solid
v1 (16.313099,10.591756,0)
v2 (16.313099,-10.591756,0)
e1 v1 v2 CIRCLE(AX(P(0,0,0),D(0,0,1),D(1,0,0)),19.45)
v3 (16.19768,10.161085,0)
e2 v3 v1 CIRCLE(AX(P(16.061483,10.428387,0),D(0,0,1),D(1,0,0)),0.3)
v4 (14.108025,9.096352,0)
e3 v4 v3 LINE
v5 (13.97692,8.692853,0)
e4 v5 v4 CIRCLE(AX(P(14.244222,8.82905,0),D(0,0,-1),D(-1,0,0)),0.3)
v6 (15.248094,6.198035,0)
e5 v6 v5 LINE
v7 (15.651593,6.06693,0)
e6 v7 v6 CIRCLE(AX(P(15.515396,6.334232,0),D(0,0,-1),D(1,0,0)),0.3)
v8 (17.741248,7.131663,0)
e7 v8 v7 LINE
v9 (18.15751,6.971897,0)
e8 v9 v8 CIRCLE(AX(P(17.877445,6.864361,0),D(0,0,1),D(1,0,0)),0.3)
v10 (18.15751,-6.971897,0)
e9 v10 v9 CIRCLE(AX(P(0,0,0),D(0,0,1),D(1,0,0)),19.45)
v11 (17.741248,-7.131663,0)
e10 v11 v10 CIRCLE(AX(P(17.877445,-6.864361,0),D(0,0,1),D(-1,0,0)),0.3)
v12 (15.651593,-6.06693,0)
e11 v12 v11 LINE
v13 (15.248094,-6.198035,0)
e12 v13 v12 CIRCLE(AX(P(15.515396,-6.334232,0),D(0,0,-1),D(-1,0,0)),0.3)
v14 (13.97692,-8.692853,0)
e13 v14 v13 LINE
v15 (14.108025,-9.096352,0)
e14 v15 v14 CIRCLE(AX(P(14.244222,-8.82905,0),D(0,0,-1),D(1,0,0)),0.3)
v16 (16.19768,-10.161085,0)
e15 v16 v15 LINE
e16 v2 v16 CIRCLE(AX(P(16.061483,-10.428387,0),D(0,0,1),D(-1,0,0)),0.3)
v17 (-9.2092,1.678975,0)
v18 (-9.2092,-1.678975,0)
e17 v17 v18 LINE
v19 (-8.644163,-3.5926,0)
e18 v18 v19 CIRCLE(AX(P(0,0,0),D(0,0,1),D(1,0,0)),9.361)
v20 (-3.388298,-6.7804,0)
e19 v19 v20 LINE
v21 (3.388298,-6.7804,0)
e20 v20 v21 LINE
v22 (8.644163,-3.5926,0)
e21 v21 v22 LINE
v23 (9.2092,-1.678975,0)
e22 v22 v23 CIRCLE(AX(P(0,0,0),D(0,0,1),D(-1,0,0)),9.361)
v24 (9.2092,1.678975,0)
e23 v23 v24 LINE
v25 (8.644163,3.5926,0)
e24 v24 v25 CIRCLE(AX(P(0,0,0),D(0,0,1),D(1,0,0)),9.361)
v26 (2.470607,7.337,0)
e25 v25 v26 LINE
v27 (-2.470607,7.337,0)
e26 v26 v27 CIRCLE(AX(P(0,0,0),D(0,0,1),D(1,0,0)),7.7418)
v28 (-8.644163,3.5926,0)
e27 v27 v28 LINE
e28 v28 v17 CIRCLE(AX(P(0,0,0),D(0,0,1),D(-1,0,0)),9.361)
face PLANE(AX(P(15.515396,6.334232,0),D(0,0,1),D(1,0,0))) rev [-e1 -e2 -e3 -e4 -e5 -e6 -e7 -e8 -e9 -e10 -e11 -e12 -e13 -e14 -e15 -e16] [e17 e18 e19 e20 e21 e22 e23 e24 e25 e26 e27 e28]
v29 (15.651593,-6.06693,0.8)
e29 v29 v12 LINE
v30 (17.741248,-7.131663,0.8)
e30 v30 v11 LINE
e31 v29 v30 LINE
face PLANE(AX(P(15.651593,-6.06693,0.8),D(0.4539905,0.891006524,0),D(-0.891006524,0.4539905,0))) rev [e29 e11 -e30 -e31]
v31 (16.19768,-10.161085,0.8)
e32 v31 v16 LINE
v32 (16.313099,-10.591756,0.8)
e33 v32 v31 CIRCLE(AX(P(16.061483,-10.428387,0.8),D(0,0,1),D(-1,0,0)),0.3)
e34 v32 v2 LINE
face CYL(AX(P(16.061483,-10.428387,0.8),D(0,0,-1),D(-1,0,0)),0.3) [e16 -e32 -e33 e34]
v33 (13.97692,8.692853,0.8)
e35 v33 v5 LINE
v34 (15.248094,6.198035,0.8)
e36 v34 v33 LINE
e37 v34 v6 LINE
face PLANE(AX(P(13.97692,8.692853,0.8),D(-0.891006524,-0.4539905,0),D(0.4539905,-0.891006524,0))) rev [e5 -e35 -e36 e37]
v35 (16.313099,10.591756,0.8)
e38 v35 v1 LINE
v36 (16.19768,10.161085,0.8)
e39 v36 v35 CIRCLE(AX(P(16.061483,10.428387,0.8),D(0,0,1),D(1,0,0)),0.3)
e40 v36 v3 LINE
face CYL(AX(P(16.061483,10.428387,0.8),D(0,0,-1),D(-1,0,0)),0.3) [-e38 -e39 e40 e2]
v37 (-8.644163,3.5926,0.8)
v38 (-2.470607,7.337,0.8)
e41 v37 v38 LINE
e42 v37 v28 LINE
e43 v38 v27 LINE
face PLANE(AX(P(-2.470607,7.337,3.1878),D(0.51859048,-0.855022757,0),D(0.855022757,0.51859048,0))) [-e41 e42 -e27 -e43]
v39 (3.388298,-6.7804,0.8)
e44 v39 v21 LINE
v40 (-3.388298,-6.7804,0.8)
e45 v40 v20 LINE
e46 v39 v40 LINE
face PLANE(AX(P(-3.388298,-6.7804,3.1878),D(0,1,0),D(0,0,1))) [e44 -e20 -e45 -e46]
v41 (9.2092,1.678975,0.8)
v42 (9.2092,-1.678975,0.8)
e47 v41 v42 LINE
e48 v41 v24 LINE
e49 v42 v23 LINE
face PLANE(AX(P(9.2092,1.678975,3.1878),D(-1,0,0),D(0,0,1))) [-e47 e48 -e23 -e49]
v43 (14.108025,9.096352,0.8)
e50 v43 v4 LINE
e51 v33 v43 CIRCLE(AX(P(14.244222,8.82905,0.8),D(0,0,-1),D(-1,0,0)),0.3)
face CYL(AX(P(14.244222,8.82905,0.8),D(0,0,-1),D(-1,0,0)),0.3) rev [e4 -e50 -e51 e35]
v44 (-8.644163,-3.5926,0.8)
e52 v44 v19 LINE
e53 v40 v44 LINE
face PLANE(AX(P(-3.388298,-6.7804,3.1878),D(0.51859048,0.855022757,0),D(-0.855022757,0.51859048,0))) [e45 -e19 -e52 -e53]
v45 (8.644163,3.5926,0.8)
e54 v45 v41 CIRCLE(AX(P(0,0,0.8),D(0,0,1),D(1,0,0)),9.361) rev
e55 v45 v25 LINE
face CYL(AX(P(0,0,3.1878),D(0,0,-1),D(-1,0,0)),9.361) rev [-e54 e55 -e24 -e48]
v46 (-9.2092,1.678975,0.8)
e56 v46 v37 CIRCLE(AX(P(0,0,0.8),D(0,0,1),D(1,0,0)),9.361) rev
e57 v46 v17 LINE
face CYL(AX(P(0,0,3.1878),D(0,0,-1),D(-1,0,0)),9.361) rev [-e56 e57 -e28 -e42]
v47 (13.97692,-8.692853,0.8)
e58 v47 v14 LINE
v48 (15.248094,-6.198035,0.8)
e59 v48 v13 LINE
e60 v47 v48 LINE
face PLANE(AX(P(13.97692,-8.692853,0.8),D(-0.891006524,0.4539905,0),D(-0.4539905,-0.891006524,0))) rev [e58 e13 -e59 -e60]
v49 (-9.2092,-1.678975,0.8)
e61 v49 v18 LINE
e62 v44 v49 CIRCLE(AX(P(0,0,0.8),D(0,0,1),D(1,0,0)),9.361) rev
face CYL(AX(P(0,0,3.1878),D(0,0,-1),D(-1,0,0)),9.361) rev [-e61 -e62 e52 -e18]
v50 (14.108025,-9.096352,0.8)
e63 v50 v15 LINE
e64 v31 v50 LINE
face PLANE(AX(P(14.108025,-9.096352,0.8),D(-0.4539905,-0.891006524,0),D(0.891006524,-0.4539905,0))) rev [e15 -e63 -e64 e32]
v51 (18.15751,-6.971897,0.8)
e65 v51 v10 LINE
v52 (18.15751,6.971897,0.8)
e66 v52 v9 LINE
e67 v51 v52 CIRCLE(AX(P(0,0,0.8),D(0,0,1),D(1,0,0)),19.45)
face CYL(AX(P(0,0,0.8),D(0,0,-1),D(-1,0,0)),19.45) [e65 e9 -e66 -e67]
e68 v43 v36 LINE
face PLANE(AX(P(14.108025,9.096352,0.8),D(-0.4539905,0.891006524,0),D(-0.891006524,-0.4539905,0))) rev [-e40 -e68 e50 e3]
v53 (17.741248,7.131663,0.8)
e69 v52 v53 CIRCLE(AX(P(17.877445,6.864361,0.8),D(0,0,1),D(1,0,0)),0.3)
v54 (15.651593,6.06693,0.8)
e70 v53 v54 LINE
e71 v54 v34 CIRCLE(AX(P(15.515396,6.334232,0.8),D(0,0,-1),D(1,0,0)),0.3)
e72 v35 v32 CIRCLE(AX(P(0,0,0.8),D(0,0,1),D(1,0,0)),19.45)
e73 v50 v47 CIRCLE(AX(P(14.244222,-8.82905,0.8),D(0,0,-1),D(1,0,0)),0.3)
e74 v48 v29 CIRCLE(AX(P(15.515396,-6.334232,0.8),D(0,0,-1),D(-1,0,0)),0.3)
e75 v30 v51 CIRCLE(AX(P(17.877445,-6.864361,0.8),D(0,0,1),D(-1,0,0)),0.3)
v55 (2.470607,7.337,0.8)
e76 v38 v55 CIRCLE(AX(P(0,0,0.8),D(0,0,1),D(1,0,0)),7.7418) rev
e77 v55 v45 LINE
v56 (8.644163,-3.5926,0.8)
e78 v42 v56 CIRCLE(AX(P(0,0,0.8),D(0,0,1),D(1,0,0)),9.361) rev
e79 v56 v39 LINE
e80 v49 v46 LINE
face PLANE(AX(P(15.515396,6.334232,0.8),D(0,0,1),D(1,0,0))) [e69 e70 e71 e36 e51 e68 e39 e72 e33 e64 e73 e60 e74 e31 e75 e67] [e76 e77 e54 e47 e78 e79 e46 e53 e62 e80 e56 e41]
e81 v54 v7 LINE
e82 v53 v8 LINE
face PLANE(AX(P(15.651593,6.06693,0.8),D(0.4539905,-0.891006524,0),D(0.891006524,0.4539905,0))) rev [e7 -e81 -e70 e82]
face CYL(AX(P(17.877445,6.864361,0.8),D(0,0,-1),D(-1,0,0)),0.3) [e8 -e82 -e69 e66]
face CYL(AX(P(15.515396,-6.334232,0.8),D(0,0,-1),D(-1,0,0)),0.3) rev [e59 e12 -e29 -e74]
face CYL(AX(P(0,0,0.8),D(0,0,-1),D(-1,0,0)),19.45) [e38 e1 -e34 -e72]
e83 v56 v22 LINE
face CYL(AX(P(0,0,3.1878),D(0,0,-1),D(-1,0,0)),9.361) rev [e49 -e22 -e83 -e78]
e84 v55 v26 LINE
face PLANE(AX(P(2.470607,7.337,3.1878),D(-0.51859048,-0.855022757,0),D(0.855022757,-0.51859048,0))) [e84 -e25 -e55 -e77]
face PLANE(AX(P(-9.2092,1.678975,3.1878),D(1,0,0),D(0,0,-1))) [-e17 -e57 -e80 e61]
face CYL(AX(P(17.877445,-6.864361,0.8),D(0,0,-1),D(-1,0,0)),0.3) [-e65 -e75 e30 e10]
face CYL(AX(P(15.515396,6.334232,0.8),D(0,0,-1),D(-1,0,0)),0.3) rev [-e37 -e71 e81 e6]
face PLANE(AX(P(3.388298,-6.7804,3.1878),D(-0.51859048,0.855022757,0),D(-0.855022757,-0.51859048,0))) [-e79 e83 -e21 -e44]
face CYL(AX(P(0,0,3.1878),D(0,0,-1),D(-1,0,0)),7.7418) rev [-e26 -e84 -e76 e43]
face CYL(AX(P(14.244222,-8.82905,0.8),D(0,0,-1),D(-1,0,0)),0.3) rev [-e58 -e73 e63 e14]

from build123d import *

# Parameters (mm, degrees)
BOSS_EXTRU_1_DEPTH = 0.8
EMPREINTE1_DEPTH   = 0.8


# Read off the part's stored shape, not the designer's step: Empreinte1
with BuildPart() as part:
    # Esquisse1 → Boss.-Extru.1 (new body)
    with BuildSketch(Plane.XY):
        with BuildLine():
            Line((13.976920297, 8.69285333), (15.248093696, 6.198035062))
            ThreePointArc((15.248093696, 6.198035062), (15.422690555, 6.048915257), (15.651592804, 6.066930255))
            Line((15.651592804, 6.066930255), (17.741248134, 7.131662826))
            ThreePointArc((17.741248134, 7.131662826), (17.984943021, 7.144439851), (18.1575097, 6.971896548))
            ThreePointArc((18.1575097, 6.971896548), (19.45, 0), (18.1575097, -6.971896548))
            ThreePointArc((18.1575097, -6.971896548), (17.984943021, -7.144439851), (17.741248134, -7.131662826))
            Line((17.741248134, -7.131662826), (15.651592804, -6.066930255))
            ThreePointArc((15.651592804, -6.066930255), (15.422690555, -6.048915257), (15.248093696, -6.198035062))
            Line((15.248093696, -6.198035062), (13.976920297, -8.69285333))
            ThreePointArc((13.976920297, -8.69285333), (13.958905299, -8.921755578), (14.108025104, -9.096352437))
            Line((14.108025104, -9.096352437), (16.197680434, -10.161085008))
            ThreePointArc((16.197680434, -10.161085008), (16.351257526, -10.350728166), (16.313099211, -10.591755952))
            ThreePointArc((16.313099211, -10.591755952), (-19.45, 0), (16.313099211, 10.591755952))
            ThreePointArc((16.313099211, 10.591755952), (16.351257526, 10.350728166), (16.197680434, 10.161085008))
            Line((16.197680434, 10.161085008), (14.108025104, 9.096352437))
            ThreePointArc((14.108025104, 9.096352437), (13.958905299, 8.921755578), (13.976920297, 8.69285333))
        make_face()
    extrude(amount=BOSS_EXTRU_1_DEPTH)

    # Empreinte1 outline → Empreinte1 (cut)
    with BuildSketch(Plane.XY):
        with BuildLine():
            ThreePointArc((9.2092, 1.678974794), (8.977813151, 2.650885141), (8.644162553, 3.5926))
            Line((8.644162553, 3.5926), (2.470606857, 7.337))
            ThreePointArc((2.470606857, 7.337), (0, 7.7418), (-2.470606857, 7.337))
            Line((-2.470606857, 7.337), (-8.644162553, 3.5926))
            ThreePointArc((-8.644162553, 3.5926), (-8.977813151, 2.650885141), (-9.2092, 1.678974794))
            Line((-9.2092, 1.678974794), (-9.2092, -1.678974794))
            ThreePointArc((-9.2092, -1.678974794), (-8.977813151, -2.650885141), (-8.644162553, -3.5926))
            Line((-8.644162553, -3.5926), (-3.388297568, -6.7804))
            Line((-3.388297568, -6.7804), (3.388297568, -6.7804))
            Line((3.388297568, -6.7804), (8.644162553, -3.5926))
            ThreePointArc((8.644162553, -3.5926), (8.977813151, -2.650885141), (9.2092, -1.678974794))
            Line((9.2092, -1.678974794), (9.2092, 1.678974794))
        make_face()
    extrude(amount=EMPREINTE1_DEPTH, mode=Mode.SUBTRACT)


solid = part.part
